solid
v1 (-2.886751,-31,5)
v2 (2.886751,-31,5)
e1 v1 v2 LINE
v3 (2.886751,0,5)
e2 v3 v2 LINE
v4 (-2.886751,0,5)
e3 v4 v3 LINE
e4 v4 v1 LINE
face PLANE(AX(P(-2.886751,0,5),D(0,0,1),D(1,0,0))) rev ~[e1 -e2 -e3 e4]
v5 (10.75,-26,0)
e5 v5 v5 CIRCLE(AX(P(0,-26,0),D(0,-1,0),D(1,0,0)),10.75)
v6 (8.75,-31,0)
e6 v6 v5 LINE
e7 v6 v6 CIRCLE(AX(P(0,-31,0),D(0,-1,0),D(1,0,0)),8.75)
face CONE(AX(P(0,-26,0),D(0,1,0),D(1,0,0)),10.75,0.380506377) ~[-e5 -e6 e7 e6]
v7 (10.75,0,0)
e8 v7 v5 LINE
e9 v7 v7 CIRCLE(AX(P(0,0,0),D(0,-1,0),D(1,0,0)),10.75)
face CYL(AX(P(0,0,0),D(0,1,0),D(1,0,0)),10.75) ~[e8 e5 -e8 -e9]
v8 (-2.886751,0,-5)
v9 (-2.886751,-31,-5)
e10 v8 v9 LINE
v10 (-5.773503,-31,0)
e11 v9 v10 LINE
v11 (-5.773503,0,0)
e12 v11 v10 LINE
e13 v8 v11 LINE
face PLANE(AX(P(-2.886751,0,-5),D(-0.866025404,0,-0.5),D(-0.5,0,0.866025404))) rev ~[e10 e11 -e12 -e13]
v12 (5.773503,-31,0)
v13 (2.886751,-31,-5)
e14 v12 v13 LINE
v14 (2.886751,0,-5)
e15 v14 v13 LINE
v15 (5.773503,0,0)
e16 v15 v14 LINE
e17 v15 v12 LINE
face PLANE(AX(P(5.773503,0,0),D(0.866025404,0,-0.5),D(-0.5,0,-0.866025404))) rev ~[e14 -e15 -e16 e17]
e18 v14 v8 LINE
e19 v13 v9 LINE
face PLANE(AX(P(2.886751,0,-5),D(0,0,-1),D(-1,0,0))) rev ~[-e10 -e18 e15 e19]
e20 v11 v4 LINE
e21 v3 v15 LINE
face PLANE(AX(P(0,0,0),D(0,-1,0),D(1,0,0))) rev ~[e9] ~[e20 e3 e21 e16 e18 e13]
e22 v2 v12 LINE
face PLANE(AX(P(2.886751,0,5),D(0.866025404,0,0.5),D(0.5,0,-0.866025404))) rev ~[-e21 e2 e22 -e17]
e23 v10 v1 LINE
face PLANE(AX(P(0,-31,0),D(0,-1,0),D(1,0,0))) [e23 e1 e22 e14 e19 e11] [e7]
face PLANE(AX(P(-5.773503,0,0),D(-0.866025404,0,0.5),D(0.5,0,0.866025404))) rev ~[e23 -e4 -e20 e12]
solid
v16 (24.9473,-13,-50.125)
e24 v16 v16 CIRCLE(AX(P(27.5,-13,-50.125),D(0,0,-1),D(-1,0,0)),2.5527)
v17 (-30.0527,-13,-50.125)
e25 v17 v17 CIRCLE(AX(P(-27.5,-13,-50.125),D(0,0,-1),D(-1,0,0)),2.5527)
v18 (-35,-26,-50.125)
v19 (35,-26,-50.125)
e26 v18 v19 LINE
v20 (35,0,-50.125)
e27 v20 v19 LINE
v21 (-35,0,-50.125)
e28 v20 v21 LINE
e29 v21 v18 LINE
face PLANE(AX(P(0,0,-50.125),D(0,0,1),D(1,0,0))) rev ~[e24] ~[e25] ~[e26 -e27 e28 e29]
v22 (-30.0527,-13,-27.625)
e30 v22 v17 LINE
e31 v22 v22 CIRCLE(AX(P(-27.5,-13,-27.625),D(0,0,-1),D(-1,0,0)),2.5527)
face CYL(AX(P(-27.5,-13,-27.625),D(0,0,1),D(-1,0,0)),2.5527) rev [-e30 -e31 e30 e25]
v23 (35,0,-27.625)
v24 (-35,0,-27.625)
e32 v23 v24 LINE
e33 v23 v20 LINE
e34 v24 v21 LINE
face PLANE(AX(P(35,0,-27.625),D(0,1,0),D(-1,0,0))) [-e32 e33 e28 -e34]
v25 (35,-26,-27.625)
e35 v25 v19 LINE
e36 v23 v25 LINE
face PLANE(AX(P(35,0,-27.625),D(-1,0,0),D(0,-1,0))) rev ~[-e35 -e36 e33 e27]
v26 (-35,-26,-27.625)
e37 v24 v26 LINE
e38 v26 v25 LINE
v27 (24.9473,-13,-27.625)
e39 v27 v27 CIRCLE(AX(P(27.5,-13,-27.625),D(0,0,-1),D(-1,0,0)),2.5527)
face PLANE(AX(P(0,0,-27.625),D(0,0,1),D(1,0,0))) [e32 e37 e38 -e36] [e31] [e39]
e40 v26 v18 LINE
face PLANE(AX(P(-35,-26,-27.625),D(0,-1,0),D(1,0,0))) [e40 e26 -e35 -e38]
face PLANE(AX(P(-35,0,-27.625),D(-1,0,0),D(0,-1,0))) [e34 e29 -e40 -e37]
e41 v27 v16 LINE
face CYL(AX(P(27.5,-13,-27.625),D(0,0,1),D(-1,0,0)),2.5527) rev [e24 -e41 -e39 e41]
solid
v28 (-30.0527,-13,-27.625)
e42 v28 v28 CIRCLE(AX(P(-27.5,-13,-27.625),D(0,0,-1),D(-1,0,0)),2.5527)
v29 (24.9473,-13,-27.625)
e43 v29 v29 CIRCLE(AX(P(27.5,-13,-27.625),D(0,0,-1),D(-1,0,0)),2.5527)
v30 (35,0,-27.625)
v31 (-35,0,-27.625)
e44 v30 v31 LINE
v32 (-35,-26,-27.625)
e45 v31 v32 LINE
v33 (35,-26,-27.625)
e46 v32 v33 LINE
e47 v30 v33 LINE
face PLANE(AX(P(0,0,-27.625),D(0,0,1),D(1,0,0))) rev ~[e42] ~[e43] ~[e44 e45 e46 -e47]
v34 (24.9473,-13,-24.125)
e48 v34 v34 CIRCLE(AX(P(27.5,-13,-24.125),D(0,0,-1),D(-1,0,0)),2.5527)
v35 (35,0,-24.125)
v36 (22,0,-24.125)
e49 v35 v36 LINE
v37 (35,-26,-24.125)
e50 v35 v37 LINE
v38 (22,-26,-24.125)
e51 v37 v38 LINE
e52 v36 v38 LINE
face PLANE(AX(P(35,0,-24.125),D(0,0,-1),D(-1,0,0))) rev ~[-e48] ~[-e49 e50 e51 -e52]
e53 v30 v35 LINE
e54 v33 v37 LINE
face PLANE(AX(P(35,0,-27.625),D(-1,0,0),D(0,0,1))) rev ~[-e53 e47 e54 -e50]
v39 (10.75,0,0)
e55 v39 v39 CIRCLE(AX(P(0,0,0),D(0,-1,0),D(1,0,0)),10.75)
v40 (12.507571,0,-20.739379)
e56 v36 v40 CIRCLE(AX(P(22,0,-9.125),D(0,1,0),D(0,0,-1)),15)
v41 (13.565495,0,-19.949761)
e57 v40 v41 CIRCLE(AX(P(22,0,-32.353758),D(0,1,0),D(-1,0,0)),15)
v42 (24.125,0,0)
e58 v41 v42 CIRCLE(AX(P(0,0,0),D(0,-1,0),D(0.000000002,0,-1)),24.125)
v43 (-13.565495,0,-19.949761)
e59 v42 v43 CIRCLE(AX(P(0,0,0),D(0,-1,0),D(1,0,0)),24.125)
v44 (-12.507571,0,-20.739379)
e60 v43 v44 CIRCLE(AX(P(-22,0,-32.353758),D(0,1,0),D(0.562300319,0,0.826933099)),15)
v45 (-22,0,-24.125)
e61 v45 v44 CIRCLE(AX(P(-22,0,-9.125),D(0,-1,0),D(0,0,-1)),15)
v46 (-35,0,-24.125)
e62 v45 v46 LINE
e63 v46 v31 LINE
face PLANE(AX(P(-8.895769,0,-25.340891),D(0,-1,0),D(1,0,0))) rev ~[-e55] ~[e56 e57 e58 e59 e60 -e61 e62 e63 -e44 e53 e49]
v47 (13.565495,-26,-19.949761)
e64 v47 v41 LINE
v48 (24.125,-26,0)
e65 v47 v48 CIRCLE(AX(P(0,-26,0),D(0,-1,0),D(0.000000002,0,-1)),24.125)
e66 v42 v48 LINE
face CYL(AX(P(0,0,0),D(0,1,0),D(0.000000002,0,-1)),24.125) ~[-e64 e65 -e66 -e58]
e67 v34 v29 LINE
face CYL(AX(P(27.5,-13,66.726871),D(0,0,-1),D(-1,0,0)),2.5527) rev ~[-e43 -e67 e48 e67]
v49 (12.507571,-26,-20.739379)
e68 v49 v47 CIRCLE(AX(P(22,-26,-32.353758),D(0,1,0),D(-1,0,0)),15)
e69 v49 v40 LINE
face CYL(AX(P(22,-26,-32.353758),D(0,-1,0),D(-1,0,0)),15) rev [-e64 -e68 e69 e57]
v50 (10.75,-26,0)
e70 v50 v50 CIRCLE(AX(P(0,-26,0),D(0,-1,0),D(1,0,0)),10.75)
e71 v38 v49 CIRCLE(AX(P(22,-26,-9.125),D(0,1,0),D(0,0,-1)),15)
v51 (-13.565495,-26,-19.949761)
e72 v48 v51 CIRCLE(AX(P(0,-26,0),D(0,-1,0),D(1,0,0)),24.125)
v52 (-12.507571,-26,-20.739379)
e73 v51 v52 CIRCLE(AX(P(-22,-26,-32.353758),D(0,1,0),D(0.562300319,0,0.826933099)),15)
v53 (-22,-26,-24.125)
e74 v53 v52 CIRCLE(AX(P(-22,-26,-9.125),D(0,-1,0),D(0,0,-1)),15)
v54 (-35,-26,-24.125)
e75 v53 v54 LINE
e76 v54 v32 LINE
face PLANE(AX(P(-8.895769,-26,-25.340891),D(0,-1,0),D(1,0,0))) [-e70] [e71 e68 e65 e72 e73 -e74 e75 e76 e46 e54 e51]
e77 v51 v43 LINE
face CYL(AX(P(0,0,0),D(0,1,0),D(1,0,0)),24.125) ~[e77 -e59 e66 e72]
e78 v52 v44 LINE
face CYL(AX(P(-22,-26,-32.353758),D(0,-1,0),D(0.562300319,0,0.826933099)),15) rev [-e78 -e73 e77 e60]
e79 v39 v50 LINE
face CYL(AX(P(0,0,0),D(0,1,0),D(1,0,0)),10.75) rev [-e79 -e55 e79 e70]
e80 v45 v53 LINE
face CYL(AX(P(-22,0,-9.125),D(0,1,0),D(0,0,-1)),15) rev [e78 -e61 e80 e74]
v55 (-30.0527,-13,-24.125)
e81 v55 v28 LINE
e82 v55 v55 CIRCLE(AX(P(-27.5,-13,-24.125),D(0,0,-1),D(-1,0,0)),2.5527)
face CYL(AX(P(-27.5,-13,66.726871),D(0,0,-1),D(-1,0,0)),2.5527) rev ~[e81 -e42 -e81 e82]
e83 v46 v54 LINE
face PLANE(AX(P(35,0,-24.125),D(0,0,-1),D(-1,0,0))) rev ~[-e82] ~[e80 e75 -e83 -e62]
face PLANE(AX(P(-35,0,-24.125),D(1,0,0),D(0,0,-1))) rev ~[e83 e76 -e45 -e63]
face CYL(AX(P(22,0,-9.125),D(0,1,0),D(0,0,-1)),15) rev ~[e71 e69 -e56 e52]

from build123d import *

# Parameters (mm, degrees)
F0_R         = 10.75
F1_DEPTH     = 26
F2_W         = 14
F2_H         = 26
F3_DEPTH     = 2
F4_T1_DEPTH  = 26
F4_T6_DEPTH  = 26
F4_T11_DEPTH = 26
F5_DEPTH     = 31
F6_SIZE2     = 5
F6_SIZE      = 2
F7_D         = 5.1054
F8_DEPTH     = 22.5


# Not quite as in the source:
# - a fillet or chamfer that OpenCascade refuses, or shapes differently, is made with other operations: its cross-section is extruded or revolved along the edge and cut away or added


with BuildPart() as f1:
    # F0 (on Front) → F1 (new body)
    with BuildSketch(Plane.XZ):
        with BuildLine():
            ThreePointArc((4.14e-08, -24.125), (17.0589511108, -17.0589510815), (24.125, 0))
            ThreePointArc((24.125, 0), (-17.0589511108, 17.0589510815), (4.14e-08, -24.125))
        make_face()
        Circle(F0_R, mode=Mode.SUBTRACT)
    extrude(amount=F1_DEPTH)



with BuildPart() as f1b:
    # F0 (on Front) → F1, piece 2 (new body)
    with BuildSketch(Plane.XZ):
        Polygon((35, -24.125), (4.14e-08, -24.125), (-35, -24.125), (-35, -27.625), (35, -27.625), align=None)
    extrude(amount=F1_DEPTH)


with BuildPart() as f1_1:
    add(f1.part)

    add(f1b.part)  # F3 merges F1b
    # F2 (on face) → F3 (join)
    with BuildSketch(Plane.XY.offset(-24.125)):
        with Locations((0, -13)):
            Rectangle(F2_W, F2_H)
    extrude(amount=F3_DEPTH)

    # F4: fillet of radius 15 on 4 edges, made by hand

    # F4_s2 → F4_t1 (join)
    with BuildSketch(Plane.XZ):
        with BuildLine():
            ThreePointArc((-22, -24.125), (-11.3933982822, -19.7316017178), (-7, -9.125))
            Line((-7, -9.125), (-7, -24.125))
            Line((-7, -24.125), (-22, -24.125))
        make_face()
        with BuildLine():
            ThreePointArc((22, -24.125), (11.3933982822, -19.7316017178), (7, -9.125))
            Line((7, -9.125), (7, -24.125))
            Line((7, -24.125), (22, -24.125))
        make_face()
    extrude(amount=F4_T1_DEPTH)


with BuildPart() as f4_tool4:
    # F4_s5 → F4_t6 (new body)
    with BuildSketch(Plane.XZ.offset(26)):
        with BuildLine():
            ThreePointArc((7, -32.3537575098), (8.7425950525, -25.3365490863), (13.5654952077, -19.9497610204))
            ThreePointArc((13.5654952077, -19.9497610204), (10.4017148166, -21.7674057681), (7, -23.0871311557))
            Line((7, -23.0871311557), (7, -32.3537575098))
        make_face()
    extrude(amount=-F4_T6_DEPTH)

    split(bisect_by=Plane.XY.offset(-27.625), keep=Keep.TOP)


with BuildPart() as f1_2:
    add(f1_1.part)

    # F4_t3: union F4_tool4
    add(f4_tool4.part)


with BuildPart() as f4_tool9:
    # F4_s10 → F4_t11 (new body)
    with BuildSketch(Plane.XZ.offset(26)):
        with BuildLine():
            ThreePointArc((-13.5654952077, -19.9497610204), (-8.7425950525, -25.3365490863), (-7, -32.3537575098))
            Line((-7, -32.3537575098), (-7, -23.0871311557))
            ThreePointArc((-7, -23.0871311557), (-10.4017148166, -21.7674057681), (-13.5654952077, -19.9497610204))
        make_face()
    extrude(amount=-F4_T11_DEPTH)

    split(bisect_by=Plane.XY.offset(-27.625), keep=Keep.TOP)


with BuildPart() as f1_3:
    add(f1_2.part)

    # F4_t8: union F4_tool9
    add(f4_tool9.part)

    # F7 (through all)
    with Locations(Plane.XY.offset(-24.125)):
        with Locations((-27.5, -13), (27.5, -13)):
            Hole(F7_D / 2)


with BuildPart() as f5:
    # F0 (on Front) → F5 (new body)
    with BuildSketch(Plane.XZ):
        Circle(F0_R)
        Polygon((-5.7735026919, 0), (-2.8867513459, 5), (2.8867513459, 5), (5.7735026919, 0), (2.8867513459, -5), (-2.8867513459, -5), align=None, mode=Mode.SUBTRACT)
    extrude(amount=F5_DEPTH)

    # F6
    f6_edges = [f5.edges().sort_by_distance(p)[0] for p in [
        (-10.75, -31, 0),
    ]]
    f6_side = f5.faces().sort_by_distance((-10.445944, -31, 0))[0]
    chamfer(f6_edges, length=F6_SIZE, length2=F6_SIZE2, reference=f6_side)


with BuildPart() as f8:
    # F8 (new): a face of the model
    f8_faces = [f1_3.part.faces().sort_by_distance(p)[0] for p in [
        (0, -13, -27.625),
    ]]
    extrude(f8_faces, amount=F8_DEPTH)


solid = Compound([f1_3.part, f5.part, f8.part])
